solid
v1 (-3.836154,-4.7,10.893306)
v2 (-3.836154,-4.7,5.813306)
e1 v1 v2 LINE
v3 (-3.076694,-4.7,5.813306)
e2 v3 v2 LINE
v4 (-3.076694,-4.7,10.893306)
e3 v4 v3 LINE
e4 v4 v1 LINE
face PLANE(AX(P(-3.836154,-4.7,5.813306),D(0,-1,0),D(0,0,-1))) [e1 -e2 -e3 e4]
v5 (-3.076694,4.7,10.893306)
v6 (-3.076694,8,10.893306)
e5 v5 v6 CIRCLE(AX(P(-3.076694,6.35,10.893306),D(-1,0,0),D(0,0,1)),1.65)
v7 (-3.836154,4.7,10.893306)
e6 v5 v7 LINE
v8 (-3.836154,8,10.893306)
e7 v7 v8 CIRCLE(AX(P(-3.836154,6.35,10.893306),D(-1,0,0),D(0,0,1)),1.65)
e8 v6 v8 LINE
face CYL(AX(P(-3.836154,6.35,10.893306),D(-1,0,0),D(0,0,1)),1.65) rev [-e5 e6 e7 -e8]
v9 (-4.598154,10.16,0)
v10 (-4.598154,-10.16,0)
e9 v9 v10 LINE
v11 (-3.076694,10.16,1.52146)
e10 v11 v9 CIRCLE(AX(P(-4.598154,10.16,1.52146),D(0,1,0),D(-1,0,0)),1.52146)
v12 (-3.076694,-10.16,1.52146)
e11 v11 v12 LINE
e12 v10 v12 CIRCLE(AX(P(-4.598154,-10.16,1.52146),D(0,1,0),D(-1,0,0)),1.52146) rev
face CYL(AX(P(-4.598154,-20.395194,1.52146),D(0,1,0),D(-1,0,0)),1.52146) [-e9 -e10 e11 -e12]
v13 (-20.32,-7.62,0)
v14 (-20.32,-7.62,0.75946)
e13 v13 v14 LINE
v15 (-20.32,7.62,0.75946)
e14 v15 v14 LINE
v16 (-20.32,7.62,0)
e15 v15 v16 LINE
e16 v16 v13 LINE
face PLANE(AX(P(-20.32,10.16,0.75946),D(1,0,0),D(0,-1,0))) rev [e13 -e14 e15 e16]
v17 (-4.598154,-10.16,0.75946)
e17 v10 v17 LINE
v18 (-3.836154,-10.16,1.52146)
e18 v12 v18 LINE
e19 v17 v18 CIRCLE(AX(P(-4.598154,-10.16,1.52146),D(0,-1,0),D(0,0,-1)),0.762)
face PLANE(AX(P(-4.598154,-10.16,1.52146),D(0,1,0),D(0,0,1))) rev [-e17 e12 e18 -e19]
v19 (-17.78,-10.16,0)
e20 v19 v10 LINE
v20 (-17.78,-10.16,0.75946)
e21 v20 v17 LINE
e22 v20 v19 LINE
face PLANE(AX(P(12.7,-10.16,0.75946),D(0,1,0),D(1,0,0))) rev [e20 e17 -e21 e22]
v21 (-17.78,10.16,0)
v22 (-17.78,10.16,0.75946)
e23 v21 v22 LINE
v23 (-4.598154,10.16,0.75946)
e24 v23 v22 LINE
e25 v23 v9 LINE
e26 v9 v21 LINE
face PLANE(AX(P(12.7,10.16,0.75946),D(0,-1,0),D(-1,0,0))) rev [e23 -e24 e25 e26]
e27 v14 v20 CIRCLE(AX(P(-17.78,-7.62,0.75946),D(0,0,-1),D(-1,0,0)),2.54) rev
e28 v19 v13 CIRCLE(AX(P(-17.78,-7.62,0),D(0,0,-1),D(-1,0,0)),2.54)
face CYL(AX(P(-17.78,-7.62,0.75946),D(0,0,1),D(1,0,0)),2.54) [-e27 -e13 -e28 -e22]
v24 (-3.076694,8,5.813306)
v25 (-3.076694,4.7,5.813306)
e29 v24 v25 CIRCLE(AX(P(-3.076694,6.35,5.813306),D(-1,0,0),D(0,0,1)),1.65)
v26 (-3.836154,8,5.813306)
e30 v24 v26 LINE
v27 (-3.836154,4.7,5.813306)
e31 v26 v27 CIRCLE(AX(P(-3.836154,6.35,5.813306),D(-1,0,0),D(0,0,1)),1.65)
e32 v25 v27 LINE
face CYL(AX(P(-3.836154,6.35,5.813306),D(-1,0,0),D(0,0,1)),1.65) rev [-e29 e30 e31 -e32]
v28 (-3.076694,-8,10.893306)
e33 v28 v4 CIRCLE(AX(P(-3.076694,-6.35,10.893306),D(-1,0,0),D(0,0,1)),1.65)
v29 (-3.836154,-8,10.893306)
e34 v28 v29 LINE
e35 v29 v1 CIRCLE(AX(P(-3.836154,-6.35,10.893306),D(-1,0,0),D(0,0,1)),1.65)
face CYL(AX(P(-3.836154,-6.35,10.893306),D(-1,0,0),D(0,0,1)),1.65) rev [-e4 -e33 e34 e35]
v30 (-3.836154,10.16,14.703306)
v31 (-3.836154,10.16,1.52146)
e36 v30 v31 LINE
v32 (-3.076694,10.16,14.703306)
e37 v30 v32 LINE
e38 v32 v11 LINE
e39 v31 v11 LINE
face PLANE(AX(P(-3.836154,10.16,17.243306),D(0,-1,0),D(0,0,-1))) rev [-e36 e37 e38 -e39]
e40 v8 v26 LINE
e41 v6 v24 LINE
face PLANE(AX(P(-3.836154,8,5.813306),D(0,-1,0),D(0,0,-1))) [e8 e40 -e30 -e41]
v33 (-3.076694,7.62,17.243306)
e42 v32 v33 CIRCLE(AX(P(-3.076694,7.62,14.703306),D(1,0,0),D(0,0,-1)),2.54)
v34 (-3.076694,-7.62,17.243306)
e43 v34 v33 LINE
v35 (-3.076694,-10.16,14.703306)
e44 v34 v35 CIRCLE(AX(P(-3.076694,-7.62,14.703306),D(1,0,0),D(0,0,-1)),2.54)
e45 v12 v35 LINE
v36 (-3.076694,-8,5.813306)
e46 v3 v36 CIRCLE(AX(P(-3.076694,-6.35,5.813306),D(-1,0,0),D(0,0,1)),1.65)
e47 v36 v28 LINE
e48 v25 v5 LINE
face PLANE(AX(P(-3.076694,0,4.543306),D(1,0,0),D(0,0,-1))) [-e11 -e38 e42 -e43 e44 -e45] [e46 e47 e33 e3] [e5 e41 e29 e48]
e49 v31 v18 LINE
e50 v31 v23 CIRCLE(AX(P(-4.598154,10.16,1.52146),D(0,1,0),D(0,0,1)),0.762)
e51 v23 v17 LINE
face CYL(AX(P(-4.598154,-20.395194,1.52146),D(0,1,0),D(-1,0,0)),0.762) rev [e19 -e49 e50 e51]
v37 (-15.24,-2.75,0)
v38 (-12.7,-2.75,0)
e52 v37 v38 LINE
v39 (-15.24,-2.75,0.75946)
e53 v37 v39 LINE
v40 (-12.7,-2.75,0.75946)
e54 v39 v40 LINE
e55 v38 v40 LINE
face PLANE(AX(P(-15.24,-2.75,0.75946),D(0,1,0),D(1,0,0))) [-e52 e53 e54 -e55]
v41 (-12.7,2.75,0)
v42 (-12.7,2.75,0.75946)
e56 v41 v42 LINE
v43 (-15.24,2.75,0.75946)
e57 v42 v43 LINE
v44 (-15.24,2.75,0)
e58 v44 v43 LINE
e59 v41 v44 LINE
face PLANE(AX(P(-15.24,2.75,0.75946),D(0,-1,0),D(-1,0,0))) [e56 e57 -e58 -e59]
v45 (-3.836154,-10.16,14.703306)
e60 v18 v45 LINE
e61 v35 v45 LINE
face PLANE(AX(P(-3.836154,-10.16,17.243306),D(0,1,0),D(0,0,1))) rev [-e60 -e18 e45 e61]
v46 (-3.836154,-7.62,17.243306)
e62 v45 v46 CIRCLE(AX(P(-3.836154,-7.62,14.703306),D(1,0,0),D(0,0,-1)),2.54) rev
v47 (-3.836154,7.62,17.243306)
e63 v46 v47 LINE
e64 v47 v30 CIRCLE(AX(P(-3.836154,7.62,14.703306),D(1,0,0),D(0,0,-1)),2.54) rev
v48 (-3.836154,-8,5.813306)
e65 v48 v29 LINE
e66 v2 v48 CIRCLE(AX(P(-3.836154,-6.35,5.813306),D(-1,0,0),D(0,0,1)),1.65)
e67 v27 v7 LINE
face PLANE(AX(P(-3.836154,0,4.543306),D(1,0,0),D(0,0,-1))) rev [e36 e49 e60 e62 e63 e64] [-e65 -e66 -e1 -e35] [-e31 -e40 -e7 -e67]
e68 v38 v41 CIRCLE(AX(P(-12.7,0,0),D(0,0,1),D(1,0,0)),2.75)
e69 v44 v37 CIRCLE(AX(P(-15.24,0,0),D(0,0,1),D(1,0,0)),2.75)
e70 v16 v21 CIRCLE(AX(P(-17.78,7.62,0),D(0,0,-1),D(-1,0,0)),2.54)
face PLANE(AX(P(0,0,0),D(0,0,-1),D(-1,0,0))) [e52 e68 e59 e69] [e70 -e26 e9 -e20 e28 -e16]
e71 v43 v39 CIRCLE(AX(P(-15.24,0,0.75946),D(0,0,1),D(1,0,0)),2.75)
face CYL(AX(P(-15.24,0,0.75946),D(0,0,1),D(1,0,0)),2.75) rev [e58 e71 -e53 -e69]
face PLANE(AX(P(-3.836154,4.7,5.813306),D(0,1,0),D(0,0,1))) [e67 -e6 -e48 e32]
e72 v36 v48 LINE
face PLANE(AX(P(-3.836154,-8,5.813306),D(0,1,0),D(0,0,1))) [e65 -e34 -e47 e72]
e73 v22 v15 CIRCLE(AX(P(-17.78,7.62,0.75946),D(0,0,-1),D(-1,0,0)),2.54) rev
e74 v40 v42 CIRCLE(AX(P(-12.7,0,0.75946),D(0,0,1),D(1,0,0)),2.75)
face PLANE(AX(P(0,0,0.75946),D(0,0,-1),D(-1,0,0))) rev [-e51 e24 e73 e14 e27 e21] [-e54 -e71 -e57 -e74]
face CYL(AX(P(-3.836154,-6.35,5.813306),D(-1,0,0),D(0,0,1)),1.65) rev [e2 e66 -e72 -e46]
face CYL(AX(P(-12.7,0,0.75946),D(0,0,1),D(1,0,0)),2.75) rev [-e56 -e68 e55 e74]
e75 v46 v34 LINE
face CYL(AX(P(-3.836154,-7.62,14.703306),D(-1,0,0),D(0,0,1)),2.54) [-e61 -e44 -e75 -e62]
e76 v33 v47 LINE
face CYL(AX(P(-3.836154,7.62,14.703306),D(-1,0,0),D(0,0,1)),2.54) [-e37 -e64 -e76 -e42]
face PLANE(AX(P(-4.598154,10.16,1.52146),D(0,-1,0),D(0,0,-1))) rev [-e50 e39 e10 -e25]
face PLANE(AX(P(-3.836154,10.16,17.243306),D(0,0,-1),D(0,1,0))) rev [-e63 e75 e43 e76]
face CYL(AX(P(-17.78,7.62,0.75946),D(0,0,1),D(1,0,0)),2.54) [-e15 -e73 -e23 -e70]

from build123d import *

# Parameters (mm, degrees)
SKETCH1_W                = 33.02
SKETCH1_H                = 20.32
BOSS_EXTRUDE1_DEPTH      = 0.75946
M3_SLOTS_REACH           = 24.731
M5_SLOT_REACH            = 24.731
FILLET1_R                = 2.54
SKETCHED_START           = -3.237390165
SKETCHED_BEND1_OUTLINE_W = 20.32
SKETCHED_BEND1_OUTLINE_H = 0.75946
SKETCHED_BEND1_DEPTH     = 15.937390165
SKETCHED_START_2         = -3.83615356
SKETCHED_BEND1_2_DEPTH   = 0.10270916
SKETCHED_START_3         = -4.59815356
SKETCHED_BEND1_3_DEPTH   = 1.52146
SKETCHED_START_4         = -10.16
SKETCHED_BEND1_4_DEPTH   = 20.32


with BuildPart() as part:
    # Sketch1 → Boss-Extrude1 (new body)
    with BuildSketch(Plane.XY):
        with Locations((-3.81, 0)):
            Rectangle(SKETCH1_W, SKETCH1_H)
    extrude(amount=BOSS_EXTRUDE1_DEPTH)

    # Sketch4 → M3 Slots (cut, up to next)
    with BuildSketch(Plane.XY.offset(0.75946), mode=Mode.PRIVATE) as m3_slots_sk1:
        with BuildLine():
            Line((1.27, 8), (6.35, 8))
            ThreePointArc((6.35, 8), (8, 6.35), (6.35, 4.7))
            Line((6.35, 4.7), (1.27, 4.7))
            ThreePointArc((1.27, 4.7), (-0.38, 6.35), (1.27, 8))
        make_face()
    m3_slots_tool1 = extrude(m3_slots_sk1.sketch, amount=-M3_SLOTS_REACH, mode=Mode.PRIVATE) & part.part
    # Sketch4 → M3 Slots (cut, up to next)
    with BuildSketch(Plane.XY.offset(0.75946), mode=Mode.PRIVATE) as m3_slots_sk2:
        with BuildLine():
            Line((1.27, -4.7), (6.35, -4.7))
            ThreePointArc((6.35, -4.7), (8, -6.35), (6.35, -8))
            Line((6.35, -8), (1.27, -8))
            ThreePointArc((1.27, -8), (-0.38, -6.35), (1.27, -4.7))
        make_face()
    m3_slots_tool2 = extrude(m3_slots_sk2.sketch, amount=-M3_SLOTS_REACH, mode=Mode.PRIVATE) & part.part
    add(m3_slots_tool1.solids().sort_by_distance((3.81, 6.35, 0.75946))[0], mode=Mode.SUBTRACT)
    add(m3_slots_tool2.solids().sort_by_distance((3.81, -6.35, 0.75946))[0], mode=Mode.SUBTRACT)

    # Sketch5 → M5 Slot (cut, up to next)
    with BuildSketch(Plane.XY.offset(0.75946), mode=Mode.PRIVATE) as m5_slot_sk1:
        with BuildLine():
            Line((-15.24, 2.75), (-12.7, 2.75))
            ThreePointArc((-12.7, 2.75), (-9.95, 0), (-12.7, -2.75))
            Line((-12.7, -2.75), (-15.24, -2.75))
            ThreePointArc((-15.24, -2.75), (-17.99, 0), (-15.24, 2.75))
        make_face()
    m5_slot_tool1 = extrude(m5_slot_sk1.sketch, amount=-M5_SLOT_REACH, mode=Mode.PRIVATE) & part.part
    add(m5_slot_tool1.solids().sort_by_distance((-13.97, 0, 0.75946))[0], mode=Mode.SUBTRACT)

    # Fillet1
    fillet1_edges = [part.edges().sort_by_distance(p)[0] for p in [
        (-20.32, -10.16, 0.37973),
        (-20.32, 10.16, 0.37973),
        (12.7, 10.16, 0.37973),
        (12.7, -10.16, 0.37973),
    ]]
    fillet(fillet1_edges, radius=FILLET1_R)

    # Sketched Bend1: read off the stored shape, not the designer's step
    # Sketched Bend1 outline → Sketched Bend1 (cut)
    with BuildSketch(Plane.YZ.offset(SKETCHED_START)):
        with Locations((0, 0.37973)):
            Rectangle(SKETCHED_BEND1_OUTLINE_W, SKETCHED_BEND1_OUTLINE_H)
    extrude(amount=SKETCHED_BEND1_DEPTH, mode=Mode.SUBTRACT)

    # Sketched Bend1 2 outline → Sketched Bend1 2 (add)
    with BuildSketch(Plane.YZ.offset(SKETCHED_START_2)):
        with BuildLine():
            Line((7.62, 17.24330644), (-7.62, 17.24330644))
            ThreePointArc((-7.62, 17.24330644), (-9.416051224, 16.499357664), (-10.16, 14.70330644))
            Line((-10.16, 14.70330644), (-10.16, 0.75946))
            Line((-10.16, 0.75946), (10.16, 0.75946))
            Line((10.16, 0.75946), (10.16, 14.70330644))
            ThreePointArc((10.16, 14.70330644), (9.416051224, 16.499357664), (7.62, 17.24330644))
        make_face()
        with BuildLine():
            ThreePointArc((-8, 10.89330644), (-6.35, 12.54330644), (-4.7, 10.89330644))
            Line((-4.7, 10.89330644), (-4.7, 5.81330644))
            ThreePointArc((-4.7, 5.81330644), (-6.35, 4.16330644), (-8, 5.81330644))
            Line((-8, 5.81330644), (-8, 10.89330644))
        make_face(mode=Mode.SUBTRACT)
        with BuildLine():
            ThreePointArc((4.7, 10.89330644), (6.35, 12.54330644), (8, 10.89330644))
            Line((8, 10.89330644), (8, 5.81330644))
            ThreePointArc((8, 5.81330644), (6.35, 4.16330644), (4.7, 5.81330644))
            Line((4.7, 5.81330644), (4.7, 10.89330644))
        make_face(mode=Mode.SUBTRACT)
    extrude(amount=SKETCHED_BEND1_2_DEPTH)

    # Sketched Bend1 3 outline → Sketched Bend1 3 (add)
    with BuildSketch(Plane.YZ.offset(SKETCHED_START_3)):
        with BuildLine():
            Line((7.62, 17.24330644), (-7.62, 17.24330644))
            ThreePointArc((-7.62, 17.24330644), (-9.416051224, 16.499357664), (-10.16, 14.70330644))
            Line((-10.16, 14.70330644), (-10.16, 0.75946))
            Line((-10.16, 0.75946), (10.16, 0.75946))
            Line((10.16, 0.75946), (10.16, 14.70330644))
            ThreePointArc((10.16, 14.70330644), (9.416051224, 16.499357664), (7.62, 17.24330644))
        make_face()
        with BuildLine():
            ThreePointArc((-8, 10.89330644), (-6.35, 12.54330644), (-4.7, 10.89330644))
            Line((-4.7, 10.89330644), (-4.7, 5.81330644))
            ThreePointArc((-4.7, 5.81330644), (-6.35, 4.16330644), (-8, 5.81330644))
            Line((-8, 5.81330644), (-8, 10.89330644))
        make_face(mode=Mode.SUBTRACT)
        with BuildLine():
            ThreePointArc((4.7, 10.89330644), (6.35, 12.54330644), (8, 10.89330644))
            Line((8, 10.89330644), (8, 5.81330644))
            ThreePointArc((8, 5.81330644), (6.35, 4.16330644), (4.7, 5.81330644))
            Line((4.7, 5.81330644), (4.7, 10.89330644))
        make_face(mode=Mode.SUBTRACT)
    extrude(amount=SKETCHED_BEND1_3_DEPTH)

    # Sketched Bend1 4 outline → Sketched Bend1 4 (cut)
    with BuildSketch(Plane(origin=(0, 0, 0), x_dir=(1, 0, 0), z_dir=(0, 1, 0)).offset(SKETCHED_START_4)):
        with BuildLine():
            Line((-4.59815356, -17.24330644), (-3.83615356, -17.24330644))
            Line((-3.83615356, -17.24330644), (-3.83615356, -1.52146))
            ThreePointArc((-3.83615356, -1.52146), (-4.059338193, -0.982644633), (-4.59815356, -0.75946))
            Line((-4.59815356, -0.75946), (-4.59815356, -17.24330644))
        make_face()
        with BuildLine():
            ThreePointArc((-4.59815356, 0), (-3.522318877, -0.445625317), (-3.07669356, -1.52146))
            Line((-3.07669356, -1.52146), (-3.07669356, -0.75946))
            Line((-3.07669356, -0.75946), (-3.237390165, -0.75946))
            Line((-3.237390165, -0.75946), (-3.237390165, 0))
            Line((-3.237390165, 0), (-4.59815356, 0))
        make_face()
    extrude(amount=SKETCHED_BEND1_4_DEPTH, mode=Mode.SUBTRACT)


solid = part.part
